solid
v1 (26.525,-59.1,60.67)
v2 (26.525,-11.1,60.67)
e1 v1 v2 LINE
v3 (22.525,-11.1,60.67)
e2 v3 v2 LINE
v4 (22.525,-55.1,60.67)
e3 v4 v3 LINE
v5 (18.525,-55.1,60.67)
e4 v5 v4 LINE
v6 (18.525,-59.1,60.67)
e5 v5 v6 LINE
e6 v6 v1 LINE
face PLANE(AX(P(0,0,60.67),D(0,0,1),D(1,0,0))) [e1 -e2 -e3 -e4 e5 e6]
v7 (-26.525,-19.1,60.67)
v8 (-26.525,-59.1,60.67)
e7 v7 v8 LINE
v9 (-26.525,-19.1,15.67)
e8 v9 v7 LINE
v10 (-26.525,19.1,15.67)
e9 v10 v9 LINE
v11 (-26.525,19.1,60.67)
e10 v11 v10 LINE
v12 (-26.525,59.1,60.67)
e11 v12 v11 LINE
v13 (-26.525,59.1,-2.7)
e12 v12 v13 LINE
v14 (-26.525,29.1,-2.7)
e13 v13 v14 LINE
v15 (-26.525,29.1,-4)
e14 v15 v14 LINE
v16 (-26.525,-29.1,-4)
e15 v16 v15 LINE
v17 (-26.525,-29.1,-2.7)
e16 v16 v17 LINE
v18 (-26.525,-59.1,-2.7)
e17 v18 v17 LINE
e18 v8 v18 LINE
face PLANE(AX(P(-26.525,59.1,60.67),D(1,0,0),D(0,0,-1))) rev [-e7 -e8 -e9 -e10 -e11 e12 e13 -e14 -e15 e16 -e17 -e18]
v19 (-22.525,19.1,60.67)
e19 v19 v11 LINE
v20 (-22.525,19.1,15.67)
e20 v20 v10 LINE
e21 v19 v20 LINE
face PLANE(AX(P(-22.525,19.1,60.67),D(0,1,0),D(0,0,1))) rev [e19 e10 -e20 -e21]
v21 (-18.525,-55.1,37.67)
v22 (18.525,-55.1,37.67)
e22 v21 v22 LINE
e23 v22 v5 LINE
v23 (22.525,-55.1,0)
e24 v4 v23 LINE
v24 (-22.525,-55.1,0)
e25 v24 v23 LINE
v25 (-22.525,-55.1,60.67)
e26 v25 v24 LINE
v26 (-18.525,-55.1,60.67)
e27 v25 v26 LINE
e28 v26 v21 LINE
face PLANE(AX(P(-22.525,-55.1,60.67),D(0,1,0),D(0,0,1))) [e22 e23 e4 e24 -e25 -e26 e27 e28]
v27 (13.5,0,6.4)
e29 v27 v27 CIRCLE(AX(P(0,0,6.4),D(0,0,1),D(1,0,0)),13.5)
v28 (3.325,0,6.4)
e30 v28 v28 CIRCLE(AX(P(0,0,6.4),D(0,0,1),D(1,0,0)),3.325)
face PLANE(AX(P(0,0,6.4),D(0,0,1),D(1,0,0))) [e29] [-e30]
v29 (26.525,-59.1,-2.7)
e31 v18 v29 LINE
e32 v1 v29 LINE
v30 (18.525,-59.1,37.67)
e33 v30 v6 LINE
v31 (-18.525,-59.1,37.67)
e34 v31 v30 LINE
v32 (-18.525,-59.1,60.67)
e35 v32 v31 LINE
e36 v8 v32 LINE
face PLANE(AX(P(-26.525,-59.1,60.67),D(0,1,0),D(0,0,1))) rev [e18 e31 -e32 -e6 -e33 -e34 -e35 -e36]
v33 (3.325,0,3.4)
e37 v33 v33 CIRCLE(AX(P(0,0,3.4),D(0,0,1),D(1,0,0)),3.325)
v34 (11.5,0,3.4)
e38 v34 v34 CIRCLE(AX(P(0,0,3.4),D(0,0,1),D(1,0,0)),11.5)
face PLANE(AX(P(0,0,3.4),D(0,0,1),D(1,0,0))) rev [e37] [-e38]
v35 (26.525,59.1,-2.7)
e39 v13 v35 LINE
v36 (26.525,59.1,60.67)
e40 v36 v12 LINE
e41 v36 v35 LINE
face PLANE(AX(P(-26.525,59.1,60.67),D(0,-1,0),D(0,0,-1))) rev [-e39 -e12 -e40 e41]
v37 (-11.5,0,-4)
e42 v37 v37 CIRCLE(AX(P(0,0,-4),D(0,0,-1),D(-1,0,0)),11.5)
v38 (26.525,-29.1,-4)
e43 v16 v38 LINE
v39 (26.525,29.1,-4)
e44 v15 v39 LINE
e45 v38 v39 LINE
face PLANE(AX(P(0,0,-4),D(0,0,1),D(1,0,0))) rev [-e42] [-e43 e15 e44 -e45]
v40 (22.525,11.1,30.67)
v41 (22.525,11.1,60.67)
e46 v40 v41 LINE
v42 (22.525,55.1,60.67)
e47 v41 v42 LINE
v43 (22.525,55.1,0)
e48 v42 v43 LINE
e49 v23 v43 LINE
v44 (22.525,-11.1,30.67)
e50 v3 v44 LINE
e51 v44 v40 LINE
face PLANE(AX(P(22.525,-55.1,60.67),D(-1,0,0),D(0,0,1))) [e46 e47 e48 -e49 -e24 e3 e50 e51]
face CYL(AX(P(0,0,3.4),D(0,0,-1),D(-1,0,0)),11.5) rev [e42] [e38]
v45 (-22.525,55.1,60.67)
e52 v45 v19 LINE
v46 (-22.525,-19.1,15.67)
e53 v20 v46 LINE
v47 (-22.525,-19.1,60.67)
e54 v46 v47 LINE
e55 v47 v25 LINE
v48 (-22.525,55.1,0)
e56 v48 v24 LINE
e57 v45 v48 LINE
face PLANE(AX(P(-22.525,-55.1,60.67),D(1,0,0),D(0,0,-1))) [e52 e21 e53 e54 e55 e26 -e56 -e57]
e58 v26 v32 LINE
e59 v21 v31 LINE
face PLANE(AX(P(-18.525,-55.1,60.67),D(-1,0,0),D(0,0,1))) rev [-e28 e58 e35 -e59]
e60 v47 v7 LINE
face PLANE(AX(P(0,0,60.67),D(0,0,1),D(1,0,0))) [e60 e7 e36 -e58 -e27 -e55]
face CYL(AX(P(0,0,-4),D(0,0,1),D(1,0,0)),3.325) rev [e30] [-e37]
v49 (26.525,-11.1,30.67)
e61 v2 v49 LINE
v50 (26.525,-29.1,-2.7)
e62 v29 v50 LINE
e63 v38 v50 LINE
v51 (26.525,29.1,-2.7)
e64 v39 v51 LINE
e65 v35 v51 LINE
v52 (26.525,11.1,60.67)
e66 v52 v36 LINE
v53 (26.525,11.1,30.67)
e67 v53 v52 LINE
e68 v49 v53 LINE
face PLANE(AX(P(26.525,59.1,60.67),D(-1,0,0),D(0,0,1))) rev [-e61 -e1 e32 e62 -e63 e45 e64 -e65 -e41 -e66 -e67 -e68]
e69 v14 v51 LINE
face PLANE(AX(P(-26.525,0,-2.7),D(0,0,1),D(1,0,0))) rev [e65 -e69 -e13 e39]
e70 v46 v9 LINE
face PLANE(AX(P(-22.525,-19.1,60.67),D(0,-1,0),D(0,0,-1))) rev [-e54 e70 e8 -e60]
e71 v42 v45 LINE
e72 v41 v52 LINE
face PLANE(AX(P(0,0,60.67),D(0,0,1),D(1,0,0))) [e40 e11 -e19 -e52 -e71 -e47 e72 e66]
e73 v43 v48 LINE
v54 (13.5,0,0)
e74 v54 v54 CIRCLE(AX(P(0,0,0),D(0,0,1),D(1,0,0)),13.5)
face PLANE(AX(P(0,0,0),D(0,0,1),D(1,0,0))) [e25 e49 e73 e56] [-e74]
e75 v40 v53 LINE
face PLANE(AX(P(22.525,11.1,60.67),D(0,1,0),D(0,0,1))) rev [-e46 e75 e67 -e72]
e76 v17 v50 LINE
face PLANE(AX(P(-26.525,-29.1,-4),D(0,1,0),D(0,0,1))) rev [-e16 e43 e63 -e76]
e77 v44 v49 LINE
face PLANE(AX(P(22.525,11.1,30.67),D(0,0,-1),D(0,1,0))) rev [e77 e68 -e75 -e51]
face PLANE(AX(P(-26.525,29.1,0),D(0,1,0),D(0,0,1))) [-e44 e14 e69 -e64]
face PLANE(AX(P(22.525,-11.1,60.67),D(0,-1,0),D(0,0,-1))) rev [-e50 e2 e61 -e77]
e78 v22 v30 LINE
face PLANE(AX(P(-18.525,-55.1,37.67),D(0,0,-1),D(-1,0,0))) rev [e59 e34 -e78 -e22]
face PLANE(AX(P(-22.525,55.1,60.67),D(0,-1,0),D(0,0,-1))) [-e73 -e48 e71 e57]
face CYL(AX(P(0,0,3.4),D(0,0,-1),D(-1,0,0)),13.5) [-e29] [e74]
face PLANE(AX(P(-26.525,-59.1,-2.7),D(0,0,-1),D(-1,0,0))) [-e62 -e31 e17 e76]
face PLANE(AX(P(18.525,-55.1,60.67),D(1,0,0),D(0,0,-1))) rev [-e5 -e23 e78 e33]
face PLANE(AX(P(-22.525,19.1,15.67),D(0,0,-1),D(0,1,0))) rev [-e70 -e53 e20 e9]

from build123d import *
from build123d.topology import SkipClean

# Parameters (mm, degrees)
SKETCH1_W           = 53.05
SKETCH1_H           = 118.2
SKETCH1_W_2         = 45.05
SKETCH1_H_2         = 110.2
BOSS_EXTRUDE1_DEPTH = 60.67
SKETCH2_W           = 53.05
SKETCH2_H           = 118.2
BOSS_EXTRUDE2_DEPTH = 4
SKETCH3_W           = 30
SKETCH3_H           = 22.2
CUT_EXTRUDE1_DEPTH  = 4
SKETCH4_W           = 45
SKETCH4_H           = 38.2
CUT_EXTRUDE2_DEPTH  = 4
SKETCH5_W           = 37.05
SKETCH5_H           = 23
CUT_EXTRUDE3_DEPTH  = 4
SKETCH6_R           = 13.5
SKETCH6_R_2         = 11.5
BOSS_EXTRUDE3_DEPTH = 3.4
SKETCH9_R           = 11.5
CUT_EXTRUDE4_DEPTH  = 5.5
SKETCH10_W          = 1.3
SKETCH10_H          = 30
CUT_EXTRUDE6_DEPTH  = 100.939788873
SKETCH8_R           = 13.5
BOSS_EXTRUDE5_DEPTH = 3
SKETCH12_R          = 3.325
CUT_EXTRUDE8_DEPTH  = 85.508097393


with BuildPart() as part:
    # Sketch1 → Boss-Extrude1 (new body)
    with BuildSketch(Plane.XY):
        Rectangle(SKETCH1_W, SKETCH1_H)
        Rectangle(SKETCH1_W_2, SKETCH1_H_2, mode=Mode.SUBTRACT)
    extrude(amount=BOSS_EXTRUDE1_DEPTH)

    # Sketch2 → Boss-Extrude2 (add)
    with BuildSketch(Plane.XY):
        Rectangle(SKETCH2_W, SKETCH2_H)
    extrude(amount=-BOSS_EXTRUDE2_DEPTH)

    # Sketch3 → Cut-Extrude1 (cut)
    with BuildSketch(Plane(origin=(26.525, 0, 0), x_dir=(0, 0, -1), z_dir=(1, 0, 0))):
        with Locations((-45.67, 0)):
            Rectangle(SKETCH3_W, SKETCH3_H)
    extrude(amount=-CUT_EXTRUDE1_DEPTH, mode=Mode.SUBTRACT)

    # Sketch4 → Cut-Extrude2 (cut)
    with BuildSketch(Plane.ZY.offset(26.525)):
        with Locations((38.17, 0)):
            Rectangle(SKETCH4_W, SKETCH4_H)
    extrude(amount=-CUT_EXTRUDE2_DEPTH, mode=Mode.SUBTRACT)

    # Sketch5 → Cut-Extrude3 (cut)
    with BuildSketch(Plane.XZ.offset(59.1)):
        with Locations((0, 49.17)):
            Rectangle(SKETCH5_W, SKETCH5_H)
    extrude(amount=-CUT_EXTRUDE3_DEPTH, mode=Mode.SUBTRACT)

    # Sketch6 → Boss-Extrude3 (add)
    with BuildSketch(Plane.XY):
        Circle(SKETCH6_R)
        Circle(SKETCH6_R_2, mode=Mode.SUBTRACT)
    extrude(amount=BOSS_EXTRUDE3_DEPTH)

    # Sketch9 → Cut-Extrude4 (cut)
    with SkipClean():  # the faces are left unmerged after this step: merging them gives an invalid solid
        with BuildSketch(Plane(origin=(0, 0, -4), x_dir=(-1, 0, 0), z_dir=(0, 0, -1))):
            Circle(SKETCH9_R)
        extrude(amount=-CUT_EXTRUDE4_DEPTH, mode=Mode.SUBTRACT)
    add(part.part.scale(1), mode=Mode.REPLACE)  # the faces are merged on a copy

    # Sketch10 → Cut-Extrude6 (cut, through all)
    with BuildSketch(Plane(origin=(26.525, 0, 0), x_dir=(0, 0, -1), z_dir=(1, 0, 0))):
        with Locations((3.35, 44.1)):
            Rectangle(SKETCH10_W, SKETCH10_H)
        with Locations((3.35, -44.1)):
            Rectangle(SKETCH10_W, SKETCH10_H)
    extrude(amount=-CUT_EXTRUDE6_DEPTH, mode=Mode.SUBTRACT)

    # Sketch8 → Boss-Extrude5 (add)
    with SkipClean():  # the faces are left unmerged after this step: merging them gives an invalid solid
        with BuildSketch(Plane.XY.offset(3.4)):
            Circle(SKETCH8_R)
        extrude(amount=BOSS_EXTRUDE5_DEPTH)

    # Sketch12 → Cut-Extrude8 (cut, through all)
    with SkipClean():  # the faces are left unmerged after this step: merging them gives an invalid solid
        with BuildSketch(Plane.XY.offset(6.4)):
            Circle(SKETCH12_R)
        extrude(amount=-CUT_EXTRUDE8_DEPTH, mode=Mode.SUBTRACT)


solid = part.part
